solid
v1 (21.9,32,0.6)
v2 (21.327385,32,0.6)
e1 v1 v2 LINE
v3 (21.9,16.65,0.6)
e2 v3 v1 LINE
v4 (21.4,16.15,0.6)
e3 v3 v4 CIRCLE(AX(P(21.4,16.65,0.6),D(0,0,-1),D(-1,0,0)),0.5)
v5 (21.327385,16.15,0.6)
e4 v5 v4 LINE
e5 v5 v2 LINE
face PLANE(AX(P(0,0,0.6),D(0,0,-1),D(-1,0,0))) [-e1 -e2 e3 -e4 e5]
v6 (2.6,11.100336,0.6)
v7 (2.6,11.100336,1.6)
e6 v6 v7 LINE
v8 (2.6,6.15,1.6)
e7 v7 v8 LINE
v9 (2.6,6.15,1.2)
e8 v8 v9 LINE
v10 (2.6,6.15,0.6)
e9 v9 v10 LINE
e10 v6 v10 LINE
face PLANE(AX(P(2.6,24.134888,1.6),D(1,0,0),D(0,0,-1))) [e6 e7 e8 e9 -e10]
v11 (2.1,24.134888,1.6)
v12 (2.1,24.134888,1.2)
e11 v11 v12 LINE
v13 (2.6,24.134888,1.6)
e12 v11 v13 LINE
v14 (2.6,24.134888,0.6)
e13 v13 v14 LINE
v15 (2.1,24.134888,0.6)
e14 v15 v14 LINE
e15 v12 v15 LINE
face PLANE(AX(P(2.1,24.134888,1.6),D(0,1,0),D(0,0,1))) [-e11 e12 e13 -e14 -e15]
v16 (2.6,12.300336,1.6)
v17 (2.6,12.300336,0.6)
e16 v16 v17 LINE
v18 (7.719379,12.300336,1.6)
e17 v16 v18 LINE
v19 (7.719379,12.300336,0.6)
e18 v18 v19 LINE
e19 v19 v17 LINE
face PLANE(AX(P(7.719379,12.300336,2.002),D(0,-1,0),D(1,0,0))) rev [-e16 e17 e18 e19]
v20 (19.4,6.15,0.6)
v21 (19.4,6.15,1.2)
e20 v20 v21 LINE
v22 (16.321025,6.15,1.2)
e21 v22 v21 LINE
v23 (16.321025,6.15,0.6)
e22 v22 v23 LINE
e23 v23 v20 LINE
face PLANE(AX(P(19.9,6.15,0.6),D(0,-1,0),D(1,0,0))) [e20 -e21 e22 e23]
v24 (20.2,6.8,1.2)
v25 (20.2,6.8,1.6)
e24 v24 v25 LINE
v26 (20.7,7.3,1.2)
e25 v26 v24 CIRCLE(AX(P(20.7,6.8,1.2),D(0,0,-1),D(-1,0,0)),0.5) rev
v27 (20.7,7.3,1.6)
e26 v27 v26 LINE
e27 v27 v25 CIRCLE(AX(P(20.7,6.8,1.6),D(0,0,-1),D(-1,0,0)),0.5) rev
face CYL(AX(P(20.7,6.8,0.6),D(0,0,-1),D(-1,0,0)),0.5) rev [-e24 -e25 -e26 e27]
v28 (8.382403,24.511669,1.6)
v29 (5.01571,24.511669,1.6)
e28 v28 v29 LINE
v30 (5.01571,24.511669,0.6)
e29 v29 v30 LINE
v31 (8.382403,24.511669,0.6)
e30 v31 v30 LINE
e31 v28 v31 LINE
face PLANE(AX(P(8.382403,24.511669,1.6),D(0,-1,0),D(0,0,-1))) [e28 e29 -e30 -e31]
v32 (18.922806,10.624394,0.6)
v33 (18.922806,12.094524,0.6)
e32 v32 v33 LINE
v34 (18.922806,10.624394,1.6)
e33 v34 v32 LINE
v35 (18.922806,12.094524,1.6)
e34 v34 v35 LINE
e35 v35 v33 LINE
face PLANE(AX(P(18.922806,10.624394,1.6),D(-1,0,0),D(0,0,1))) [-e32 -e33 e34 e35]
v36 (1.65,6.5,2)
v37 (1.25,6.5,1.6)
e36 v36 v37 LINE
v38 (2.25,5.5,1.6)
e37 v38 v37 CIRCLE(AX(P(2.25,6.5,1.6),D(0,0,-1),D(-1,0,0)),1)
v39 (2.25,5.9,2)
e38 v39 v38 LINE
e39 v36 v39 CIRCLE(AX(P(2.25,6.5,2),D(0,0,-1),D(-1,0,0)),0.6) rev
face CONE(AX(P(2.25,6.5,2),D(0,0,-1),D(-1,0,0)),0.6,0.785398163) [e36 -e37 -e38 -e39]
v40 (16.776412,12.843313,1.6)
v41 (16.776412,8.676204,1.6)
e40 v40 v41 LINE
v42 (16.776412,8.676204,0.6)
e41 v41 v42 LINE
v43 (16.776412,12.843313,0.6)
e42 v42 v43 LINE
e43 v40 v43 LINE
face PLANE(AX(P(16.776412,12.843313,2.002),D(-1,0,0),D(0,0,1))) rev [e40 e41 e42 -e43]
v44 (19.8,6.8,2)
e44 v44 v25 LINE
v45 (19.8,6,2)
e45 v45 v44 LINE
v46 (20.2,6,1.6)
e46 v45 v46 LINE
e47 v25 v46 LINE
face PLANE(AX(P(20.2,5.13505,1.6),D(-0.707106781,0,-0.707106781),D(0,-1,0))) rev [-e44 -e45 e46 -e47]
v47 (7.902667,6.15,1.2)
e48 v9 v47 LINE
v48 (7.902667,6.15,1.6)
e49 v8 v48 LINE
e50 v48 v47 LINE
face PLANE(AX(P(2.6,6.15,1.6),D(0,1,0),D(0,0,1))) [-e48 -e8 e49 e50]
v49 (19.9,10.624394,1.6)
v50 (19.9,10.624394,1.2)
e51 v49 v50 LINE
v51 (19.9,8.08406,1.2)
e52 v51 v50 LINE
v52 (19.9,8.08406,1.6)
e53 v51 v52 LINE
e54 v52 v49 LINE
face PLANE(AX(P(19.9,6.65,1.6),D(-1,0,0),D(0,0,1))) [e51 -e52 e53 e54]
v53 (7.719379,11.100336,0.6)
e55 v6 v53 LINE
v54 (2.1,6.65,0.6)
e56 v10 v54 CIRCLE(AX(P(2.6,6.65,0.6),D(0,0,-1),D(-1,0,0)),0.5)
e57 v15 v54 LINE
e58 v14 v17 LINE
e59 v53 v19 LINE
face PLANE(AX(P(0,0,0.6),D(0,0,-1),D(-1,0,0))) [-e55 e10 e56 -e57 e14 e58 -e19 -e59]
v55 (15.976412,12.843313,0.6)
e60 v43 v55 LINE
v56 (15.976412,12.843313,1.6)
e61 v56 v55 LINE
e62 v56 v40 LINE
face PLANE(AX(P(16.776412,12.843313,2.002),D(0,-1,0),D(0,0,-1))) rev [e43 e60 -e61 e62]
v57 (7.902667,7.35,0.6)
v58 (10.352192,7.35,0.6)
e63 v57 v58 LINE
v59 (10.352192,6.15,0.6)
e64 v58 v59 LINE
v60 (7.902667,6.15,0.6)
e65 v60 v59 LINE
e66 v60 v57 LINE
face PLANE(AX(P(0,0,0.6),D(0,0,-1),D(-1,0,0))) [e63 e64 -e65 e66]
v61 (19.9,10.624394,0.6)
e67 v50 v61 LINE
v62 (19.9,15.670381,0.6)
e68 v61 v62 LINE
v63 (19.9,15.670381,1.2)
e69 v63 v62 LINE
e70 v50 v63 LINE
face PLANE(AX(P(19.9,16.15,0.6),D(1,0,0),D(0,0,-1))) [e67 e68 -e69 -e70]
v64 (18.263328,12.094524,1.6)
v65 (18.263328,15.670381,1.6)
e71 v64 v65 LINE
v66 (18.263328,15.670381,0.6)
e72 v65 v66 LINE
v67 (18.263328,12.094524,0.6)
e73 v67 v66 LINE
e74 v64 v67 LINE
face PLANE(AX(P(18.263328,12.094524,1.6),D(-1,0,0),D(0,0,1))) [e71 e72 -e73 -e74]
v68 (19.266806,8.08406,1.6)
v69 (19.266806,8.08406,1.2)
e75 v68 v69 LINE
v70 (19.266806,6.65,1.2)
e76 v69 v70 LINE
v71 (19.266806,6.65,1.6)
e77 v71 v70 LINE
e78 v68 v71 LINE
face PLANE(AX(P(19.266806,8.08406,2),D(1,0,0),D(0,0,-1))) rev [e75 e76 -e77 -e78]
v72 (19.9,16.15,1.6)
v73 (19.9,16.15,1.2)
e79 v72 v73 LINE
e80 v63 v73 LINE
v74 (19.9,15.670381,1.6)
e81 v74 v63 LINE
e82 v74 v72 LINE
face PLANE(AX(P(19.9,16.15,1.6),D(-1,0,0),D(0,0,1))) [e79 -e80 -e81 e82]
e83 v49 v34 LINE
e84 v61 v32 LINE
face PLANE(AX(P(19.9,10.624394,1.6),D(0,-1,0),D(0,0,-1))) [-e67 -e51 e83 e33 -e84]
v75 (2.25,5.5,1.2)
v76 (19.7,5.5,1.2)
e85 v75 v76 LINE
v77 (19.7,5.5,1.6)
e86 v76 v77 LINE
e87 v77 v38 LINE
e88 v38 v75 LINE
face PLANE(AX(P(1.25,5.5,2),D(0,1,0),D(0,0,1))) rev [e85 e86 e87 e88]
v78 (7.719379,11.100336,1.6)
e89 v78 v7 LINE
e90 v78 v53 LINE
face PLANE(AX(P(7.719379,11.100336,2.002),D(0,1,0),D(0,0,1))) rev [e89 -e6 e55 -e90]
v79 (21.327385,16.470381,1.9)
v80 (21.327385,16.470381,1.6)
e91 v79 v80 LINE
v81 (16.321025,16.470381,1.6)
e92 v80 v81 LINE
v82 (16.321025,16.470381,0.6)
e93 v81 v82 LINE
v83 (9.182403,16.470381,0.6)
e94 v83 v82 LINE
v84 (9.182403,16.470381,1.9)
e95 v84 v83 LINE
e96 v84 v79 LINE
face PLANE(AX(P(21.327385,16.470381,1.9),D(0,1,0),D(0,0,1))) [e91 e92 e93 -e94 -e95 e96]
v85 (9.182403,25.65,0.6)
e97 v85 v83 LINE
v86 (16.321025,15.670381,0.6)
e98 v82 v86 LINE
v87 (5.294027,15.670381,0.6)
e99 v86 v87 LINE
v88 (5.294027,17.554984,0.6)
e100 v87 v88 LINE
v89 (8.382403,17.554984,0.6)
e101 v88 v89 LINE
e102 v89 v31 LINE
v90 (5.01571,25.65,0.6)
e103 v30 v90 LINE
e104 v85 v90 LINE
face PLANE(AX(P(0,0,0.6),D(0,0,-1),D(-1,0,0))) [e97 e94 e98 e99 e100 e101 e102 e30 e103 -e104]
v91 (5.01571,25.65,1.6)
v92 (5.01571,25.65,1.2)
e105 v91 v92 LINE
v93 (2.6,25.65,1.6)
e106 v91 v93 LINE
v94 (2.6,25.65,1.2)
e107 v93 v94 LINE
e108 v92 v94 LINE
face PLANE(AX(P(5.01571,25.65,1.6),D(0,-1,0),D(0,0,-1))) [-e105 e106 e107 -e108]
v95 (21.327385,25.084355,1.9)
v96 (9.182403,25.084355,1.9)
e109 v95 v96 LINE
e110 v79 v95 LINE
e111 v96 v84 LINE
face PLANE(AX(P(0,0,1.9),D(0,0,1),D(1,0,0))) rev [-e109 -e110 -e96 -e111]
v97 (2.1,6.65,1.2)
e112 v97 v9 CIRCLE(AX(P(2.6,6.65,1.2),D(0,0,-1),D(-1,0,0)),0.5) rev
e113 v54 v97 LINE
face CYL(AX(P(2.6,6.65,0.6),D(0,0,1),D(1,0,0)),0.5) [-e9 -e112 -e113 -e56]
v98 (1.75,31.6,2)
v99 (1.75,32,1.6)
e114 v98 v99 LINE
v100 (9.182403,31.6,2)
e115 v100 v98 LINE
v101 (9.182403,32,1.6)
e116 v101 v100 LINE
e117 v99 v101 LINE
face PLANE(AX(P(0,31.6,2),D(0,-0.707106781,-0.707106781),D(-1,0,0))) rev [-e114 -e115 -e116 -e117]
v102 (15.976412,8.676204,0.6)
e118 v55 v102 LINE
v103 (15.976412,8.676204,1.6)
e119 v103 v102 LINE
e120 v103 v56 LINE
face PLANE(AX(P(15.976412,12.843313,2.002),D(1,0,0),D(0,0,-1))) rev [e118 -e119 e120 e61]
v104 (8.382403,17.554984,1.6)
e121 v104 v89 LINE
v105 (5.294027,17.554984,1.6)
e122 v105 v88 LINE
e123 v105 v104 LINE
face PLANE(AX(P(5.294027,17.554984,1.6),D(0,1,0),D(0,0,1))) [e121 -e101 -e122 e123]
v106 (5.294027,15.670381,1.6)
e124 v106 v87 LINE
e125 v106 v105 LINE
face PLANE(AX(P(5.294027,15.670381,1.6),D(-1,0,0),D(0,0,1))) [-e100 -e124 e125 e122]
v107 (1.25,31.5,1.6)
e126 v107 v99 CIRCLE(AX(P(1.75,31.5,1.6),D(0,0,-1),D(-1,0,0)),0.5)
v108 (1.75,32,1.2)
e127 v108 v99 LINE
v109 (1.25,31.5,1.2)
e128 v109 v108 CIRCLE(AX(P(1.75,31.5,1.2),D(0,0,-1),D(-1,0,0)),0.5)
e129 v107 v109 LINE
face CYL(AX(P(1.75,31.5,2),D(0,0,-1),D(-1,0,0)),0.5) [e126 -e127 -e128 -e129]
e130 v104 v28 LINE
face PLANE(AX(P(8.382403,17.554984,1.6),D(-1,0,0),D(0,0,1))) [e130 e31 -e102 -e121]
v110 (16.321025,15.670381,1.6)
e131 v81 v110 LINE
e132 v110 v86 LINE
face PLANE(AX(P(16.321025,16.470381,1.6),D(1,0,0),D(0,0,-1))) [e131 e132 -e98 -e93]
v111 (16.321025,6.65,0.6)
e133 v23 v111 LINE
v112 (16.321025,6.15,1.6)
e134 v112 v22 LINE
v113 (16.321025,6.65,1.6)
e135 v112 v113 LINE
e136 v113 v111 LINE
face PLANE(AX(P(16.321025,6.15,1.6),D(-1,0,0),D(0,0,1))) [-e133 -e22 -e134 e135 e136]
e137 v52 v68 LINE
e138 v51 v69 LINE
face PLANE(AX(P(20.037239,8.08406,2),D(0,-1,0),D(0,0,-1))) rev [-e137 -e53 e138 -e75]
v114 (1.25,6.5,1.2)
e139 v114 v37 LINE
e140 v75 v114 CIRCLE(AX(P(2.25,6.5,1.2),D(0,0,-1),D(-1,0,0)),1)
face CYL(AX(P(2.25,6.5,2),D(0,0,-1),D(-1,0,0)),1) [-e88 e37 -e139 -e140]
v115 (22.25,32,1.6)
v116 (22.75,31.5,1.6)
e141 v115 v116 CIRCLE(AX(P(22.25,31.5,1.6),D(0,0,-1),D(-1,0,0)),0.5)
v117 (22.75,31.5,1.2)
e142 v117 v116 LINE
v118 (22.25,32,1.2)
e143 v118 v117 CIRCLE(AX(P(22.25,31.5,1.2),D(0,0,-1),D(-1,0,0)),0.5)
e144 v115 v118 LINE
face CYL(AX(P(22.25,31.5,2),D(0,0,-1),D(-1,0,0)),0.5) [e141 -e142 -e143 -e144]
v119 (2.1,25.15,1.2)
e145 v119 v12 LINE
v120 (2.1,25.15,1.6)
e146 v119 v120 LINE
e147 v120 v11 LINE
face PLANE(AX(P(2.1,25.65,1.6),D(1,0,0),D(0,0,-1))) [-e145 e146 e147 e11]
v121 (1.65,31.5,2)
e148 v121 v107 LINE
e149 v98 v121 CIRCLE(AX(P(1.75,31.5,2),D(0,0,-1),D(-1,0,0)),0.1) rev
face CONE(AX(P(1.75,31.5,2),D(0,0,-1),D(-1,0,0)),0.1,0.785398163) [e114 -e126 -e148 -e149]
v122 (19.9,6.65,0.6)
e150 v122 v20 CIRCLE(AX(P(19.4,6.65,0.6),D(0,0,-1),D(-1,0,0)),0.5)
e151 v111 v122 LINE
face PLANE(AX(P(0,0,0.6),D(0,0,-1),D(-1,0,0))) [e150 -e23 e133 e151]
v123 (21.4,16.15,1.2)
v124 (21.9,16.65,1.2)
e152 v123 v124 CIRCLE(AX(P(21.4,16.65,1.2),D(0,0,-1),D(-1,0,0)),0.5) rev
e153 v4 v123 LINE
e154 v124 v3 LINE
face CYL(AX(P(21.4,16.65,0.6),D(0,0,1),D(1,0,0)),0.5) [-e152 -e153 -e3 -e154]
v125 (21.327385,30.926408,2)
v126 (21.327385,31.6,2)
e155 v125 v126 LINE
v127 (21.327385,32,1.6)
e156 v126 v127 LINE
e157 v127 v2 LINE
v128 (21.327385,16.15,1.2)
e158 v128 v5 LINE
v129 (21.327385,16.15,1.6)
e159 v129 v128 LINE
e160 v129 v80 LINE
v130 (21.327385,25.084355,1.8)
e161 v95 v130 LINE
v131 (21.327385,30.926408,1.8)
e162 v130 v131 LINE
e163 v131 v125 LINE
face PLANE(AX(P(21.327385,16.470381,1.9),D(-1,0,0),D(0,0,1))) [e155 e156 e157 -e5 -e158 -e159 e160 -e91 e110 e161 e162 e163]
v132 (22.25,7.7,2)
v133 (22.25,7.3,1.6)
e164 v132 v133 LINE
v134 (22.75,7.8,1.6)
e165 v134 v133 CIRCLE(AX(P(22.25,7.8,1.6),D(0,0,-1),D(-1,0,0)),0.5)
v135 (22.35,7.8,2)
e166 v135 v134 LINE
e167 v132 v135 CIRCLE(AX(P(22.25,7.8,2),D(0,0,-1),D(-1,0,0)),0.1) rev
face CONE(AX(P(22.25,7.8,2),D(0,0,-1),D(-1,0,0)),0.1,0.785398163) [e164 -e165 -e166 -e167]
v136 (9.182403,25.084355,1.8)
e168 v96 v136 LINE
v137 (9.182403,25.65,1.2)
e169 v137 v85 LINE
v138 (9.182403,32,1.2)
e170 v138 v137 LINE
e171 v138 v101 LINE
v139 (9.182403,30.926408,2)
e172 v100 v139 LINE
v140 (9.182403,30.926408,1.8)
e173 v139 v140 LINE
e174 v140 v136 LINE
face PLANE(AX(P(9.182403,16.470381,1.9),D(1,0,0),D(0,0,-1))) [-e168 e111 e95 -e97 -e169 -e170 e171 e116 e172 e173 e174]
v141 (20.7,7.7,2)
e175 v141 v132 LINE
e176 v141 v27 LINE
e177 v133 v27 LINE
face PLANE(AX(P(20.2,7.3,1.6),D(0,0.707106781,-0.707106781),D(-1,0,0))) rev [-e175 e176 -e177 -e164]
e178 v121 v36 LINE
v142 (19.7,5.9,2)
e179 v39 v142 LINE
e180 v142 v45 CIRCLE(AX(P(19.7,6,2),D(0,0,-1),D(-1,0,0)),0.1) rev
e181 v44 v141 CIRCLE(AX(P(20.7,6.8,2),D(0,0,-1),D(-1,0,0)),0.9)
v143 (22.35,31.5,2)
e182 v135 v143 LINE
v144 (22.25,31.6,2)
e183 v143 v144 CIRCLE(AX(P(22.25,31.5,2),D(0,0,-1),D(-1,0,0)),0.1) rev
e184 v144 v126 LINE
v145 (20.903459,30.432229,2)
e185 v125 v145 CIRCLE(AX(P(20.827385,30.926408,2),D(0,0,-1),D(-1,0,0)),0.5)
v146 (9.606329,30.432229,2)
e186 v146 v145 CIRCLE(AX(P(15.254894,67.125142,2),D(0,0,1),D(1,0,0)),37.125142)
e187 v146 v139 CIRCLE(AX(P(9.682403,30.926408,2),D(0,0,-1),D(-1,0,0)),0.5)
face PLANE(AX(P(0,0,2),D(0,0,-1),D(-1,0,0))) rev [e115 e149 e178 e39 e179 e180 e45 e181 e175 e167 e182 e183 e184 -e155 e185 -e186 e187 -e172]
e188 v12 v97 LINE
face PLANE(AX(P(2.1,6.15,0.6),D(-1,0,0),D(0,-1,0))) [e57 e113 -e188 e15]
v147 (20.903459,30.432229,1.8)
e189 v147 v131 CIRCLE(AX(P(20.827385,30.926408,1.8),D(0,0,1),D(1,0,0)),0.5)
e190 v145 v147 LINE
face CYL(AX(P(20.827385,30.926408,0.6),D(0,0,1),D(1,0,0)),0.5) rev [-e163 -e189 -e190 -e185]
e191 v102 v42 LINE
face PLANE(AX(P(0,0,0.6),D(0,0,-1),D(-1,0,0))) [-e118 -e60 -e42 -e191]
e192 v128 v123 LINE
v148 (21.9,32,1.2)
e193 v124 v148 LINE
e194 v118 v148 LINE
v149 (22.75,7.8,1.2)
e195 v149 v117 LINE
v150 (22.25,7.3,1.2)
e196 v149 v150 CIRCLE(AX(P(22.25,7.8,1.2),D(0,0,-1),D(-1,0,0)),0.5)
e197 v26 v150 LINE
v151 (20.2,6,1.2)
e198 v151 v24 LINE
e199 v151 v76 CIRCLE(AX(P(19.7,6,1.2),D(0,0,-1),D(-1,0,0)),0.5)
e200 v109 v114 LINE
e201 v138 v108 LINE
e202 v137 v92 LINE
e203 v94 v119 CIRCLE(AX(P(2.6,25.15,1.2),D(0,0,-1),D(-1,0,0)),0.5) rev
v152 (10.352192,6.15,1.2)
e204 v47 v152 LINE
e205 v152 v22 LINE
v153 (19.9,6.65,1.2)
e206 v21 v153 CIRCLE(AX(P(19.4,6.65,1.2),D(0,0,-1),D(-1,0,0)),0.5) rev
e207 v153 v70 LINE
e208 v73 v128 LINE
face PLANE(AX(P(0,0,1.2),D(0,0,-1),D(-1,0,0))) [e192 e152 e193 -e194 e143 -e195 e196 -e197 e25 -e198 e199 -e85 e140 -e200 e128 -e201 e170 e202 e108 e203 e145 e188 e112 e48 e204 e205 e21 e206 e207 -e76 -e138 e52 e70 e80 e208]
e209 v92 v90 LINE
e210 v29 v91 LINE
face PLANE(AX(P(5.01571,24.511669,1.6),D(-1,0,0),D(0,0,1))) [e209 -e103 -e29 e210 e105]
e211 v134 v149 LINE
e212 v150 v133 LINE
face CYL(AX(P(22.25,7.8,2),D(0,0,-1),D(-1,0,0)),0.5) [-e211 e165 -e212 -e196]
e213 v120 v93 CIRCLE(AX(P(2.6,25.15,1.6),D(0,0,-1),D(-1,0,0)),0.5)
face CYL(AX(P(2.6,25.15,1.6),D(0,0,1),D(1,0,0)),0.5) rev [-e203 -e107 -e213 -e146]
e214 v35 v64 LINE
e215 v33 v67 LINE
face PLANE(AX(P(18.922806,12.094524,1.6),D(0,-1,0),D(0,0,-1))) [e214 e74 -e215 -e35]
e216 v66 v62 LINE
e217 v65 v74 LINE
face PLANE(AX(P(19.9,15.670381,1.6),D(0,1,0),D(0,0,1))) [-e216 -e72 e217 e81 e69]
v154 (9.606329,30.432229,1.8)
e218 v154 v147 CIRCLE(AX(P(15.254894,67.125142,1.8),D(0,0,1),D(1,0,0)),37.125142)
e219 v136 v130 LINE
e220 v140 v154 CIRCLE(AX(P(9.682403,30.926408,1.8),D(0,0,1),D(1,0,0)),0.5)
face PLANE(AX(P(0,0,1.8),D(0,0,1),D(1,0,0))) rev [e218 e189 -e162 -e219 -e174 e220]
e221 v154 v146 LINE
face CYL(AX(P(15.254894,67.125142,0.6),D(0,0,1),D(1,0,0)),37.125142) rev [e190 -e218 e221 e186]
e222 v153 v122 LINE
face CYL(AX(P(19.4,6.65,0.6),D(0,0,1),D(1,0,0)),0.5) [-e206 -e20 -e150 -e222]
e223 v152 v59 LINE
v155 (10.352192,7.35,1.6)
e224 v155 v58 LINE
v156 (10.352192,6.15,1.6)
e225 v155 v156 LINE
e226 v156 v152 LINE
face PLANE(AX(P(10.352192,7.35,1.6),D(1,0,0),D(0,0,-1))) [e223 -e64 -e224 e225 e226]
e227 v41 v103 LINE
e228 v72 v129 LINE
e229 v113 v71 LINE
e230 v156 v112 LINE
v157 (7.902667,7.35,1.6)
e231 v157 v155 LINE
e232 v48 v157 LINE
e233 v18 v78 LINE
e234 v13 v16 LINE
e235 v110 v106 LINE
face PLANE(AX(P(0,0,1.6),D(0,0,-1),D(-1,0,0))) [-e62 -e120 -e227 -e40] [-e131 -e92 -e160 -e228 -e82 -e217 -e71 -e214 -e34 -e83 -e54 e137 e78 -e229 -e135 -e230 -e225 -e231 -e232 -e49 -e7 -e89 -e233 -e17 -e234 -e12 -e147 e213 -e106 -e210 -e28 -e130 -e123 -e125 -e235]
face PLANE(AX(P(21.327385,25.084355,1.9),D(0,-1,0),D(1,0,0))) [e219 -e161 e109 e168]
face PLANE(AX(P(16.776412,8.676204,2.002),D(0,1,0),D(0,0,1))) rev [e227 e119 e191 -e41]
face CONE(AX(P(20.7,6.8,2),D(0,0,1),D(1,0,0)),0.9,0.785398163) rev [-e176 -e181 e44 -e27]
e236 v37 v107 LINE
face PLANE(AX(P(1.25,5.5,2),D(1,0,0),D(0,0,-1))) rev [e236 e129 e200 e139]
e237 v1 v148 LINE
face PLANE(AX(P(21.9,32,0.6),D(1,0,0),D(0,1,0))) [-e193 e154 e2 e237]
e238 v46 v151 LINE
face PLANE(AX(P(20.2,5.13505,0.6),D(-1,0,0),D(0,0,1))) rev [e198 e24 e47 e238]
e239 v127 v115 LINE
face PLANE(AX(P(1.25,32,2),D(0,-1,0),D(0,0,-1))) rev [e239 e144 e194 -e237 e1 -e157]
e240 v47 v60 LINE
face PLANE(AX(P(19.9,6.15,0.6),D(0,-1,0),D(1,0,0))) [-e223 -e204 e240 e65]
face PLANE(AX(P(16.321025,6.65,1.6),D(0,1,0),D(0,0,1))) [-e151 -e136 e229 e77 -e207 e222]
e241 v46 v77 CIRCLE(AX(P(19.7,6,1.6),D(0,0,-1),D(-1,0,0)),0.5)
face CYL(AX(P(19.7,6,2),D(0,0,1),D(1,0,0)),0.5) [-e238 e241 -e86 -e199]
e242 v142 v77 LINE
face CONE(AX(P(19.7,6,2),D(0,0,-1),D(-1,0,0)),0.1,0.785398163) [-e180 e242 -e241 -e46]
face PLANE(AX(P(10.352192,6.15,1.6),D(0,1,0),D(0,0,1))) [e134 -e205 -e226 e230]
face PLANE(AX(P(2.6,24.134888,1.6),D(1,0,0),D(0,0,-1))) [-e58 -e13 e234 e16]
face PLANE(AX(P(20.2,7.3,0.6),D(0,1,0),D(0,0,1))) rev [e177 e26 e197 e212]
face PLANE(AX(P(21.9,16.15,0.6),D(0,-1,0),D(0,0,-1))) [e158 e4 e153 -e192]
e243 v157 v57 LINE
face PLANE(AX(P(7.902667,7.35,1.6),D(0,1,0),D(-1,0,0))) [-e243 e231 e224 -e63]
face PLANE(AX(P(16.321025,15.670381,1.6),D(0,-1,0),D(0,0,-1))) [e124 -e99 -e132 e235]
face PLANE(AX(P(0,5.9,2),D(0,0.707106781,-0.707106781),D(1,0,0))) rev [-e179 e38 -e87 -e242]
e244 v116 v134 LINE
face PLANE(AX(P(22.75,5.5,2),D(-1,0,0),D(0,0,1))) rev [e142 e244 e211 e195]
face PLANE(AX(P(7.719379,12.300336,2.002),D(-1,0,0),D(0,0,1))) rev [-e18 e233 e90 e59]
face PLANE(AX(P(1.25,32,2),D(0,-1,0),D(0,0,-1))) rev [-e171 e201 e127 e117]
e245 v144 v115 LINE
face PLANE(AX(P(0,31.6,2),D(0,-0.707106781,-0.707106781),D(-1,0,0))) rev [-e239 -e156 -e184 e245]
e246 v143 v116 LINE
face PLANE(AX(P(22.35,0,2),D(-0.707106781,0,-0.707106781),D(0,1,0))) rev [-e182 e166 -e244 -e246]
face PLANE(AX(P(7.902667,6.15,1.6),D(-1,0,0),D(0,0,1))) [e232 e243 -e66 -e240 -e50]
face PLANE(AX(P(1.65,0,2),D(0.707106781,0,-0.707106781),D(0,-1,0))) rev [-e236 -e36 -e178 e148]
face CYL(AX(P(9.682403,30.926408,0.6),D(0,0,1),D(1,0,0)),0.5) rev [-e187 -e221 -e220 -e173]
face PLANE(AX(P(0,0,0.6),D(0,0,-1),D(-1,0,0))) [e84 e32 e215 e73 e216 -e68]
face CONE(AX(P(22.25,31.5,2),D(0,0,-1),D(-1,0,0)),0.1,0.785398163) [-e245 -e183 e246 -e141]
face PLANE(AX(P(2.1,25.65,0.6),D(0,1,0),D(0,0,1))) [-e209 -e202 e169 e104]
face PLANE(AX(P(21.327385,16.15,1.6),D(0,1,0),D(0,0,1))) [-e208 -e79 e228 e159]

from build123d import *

# Parameters (mm, degrees)
SKIZZE2_W                                   = 21.5
SKIZZE2_H                                   = 26.5
AUFSATZ_LINEAR_AUSTRAGEN1_DEPTH             = 0.8
AUFSATZ_LINEAR_AUSTRAGEN2_DEPTH             = 0.6
SCHNITT_LINEAR_AUSTRAGEN2_DEPTH             = 0.7
SCHNITT_LINEAR_AUSTRAGEN2_DEPTH_BACK        = 40.270886163
SKIZZE5_W                                   = 12.144981168
SKIZZE5_H                                   = 8.613973721
SCHNITT_LINEAR_AUSTRAGEN1_DEPTH             = 0.4
SCHNITT_LINEAR_AUSTRAGEN1_DEPTH_BACK        = 40.270886163
SCHNITT_LINEAR_AUSTRAGEN3_DEPTH             = 0.6
SCHNITT_LINEAR_AUSTRAGEN3_DEPTH_BACK        = 40.270886163
SKIZZE6_W                                   = 12.144981168
SKIZZE6_H                                   = 8.023619308
VERRUNDUNG1_R                               = 0.5
SCHNITT_LINEAR_AUSTRAGEN4_DEPTH             = 40.270886163
SCHNITT_LINEAR_AUSTRAGEN4_DEPTH_BACK        = 40.270886163
VERRUNDUNG3_R                               = 0.5
SKIZZE8_W                                   = 5.461913831
SKIZZE8_H                                   = 1.2
SKIZZE8_W_2                                 = 0.8
SKIZZE8_H_2                                 = 4.167109648
AUFSATZ_LINEAR_AUSTRAGEN3_DEPTH             = 0.6
AUFSATZ_LINEAR_AUSTRAGEN3_DIRECTION_2_REACH = 41.271
SCHNITT_LINEAR_AUSTRAGEN5_DEPTH             = 40.270886163
SCHNITT_LINEAR_AUSTRAGEN5_DEPTH_BACK        = 40.270886163
SKIZZE9_W                                   = 2.954983754
SKIZZE9_H                                   = 2.164950306
SKIZZE10_W                                  = 0.770433568
SKIZZE10_H                                  = 2.170677495
AUFSATZ_LINEAR_AUSTRAGEN4_DEPTH             = 0.8
VERRUNDUNG2_R                               = 1
VERRUNDUNG4_R                               = 0.5
FASE1_SIZE                                  = 0.4


with BuildPart() as part:
    # Skizze2 → Aufsatz-Linear austragen1 (new body)
    with BuildSketch(Plane.XY.offset(1.2)):
        with Locations((12, 18.75)):
            Rectangle(SKIZZE2_W, SKIZZE2_H)
    extrude(amount=AUFSATZ_LINEAR_AUSTRAGEN1_DEPTH)

    # Skizze3 → Aufsatz-Linear austragen2 (add)
    with BuildSketch(Plane.XY.offset(1.2)):
        Polygon((21.9, 32), (21.9, 16.15), (19.9, 16.15), (19.9, 6.15), (2.1, 6.15), (2.1, 25.65), (10, 25.65), (10, 32), align=None)
    extrude(amount=-AUFSATZ_LINEAR_AUSTRAGEN2_DEPTH)

    # Skizze5 → Schnitt-Linear austragen2 (cut, two sides: drawn at the far end of the back side and taken through both)
    with BuildSketch(Plane.XY.offset(1.2).offset(-SCHNITT_LINEAR_AUSTRAGEN2_DEPTH_BACK)):
        with Locations((15.254893919, 20.77736777)):
            Rectangle(SKIZZE5_W, SKIZZE5_H)
    extrude(amount=SCHNITT_LINEAR_AUSTRAGEN2_DEPTH + SCHNITT_LINEAR_AUSTRAGEN2_DEPTH_BACK, mode=Mode.SUBTRACT)

    # Skizze4 → Schnitt-Linear austragen1 (cut, two sides: drawn at the far end of the back side and taken through both)
    with BuildSketch(Plane.XY.offset(1.2).offset(-SCHNITT_LINEAR_AUSTRAGEN1_DEPTH_BACK)):
        Polygon((8.382403335, 24.511668734), (5.015709698, 24.511668734), (5.015709698, 25.65), (2.1, 25.65), (2.1, 24.134887808), (2.6, 24.134887808), (2.6, 6.15), (7.902667193, 6.15), (7.902667193, 7.35), (10.352191741, 7.35), (10.352191741, 6.15), (16.321024544, 6.15), (16.321024544, 6.65), (19.9, 6.65), (19.9, 10.624393956), (18.922805677, 10.624393956), (18.922805677, 12.094523693), (18.263327803, 12.094523693), (18.263327803, 15.67038091), (19.9, 15.67038091), (19.9, 16.15), (21.327384503, 16.15), (21.327384503, 16.47038091), (16.321024544, 16.47038091), (16.321024544, 15.67038091), (5.294026876, 15.67038091), (5.294026876, 17.554984477), (8.382403335, 17.554984477), align=None)
    extrude(amount=SCHNITT_LINEAR_AUSTRAGEN1_DEPTH + SCHNITT_LINEAR_AUSTRAGEN1_DEPTH_BACK, mode=Mode.SUBTRACT)

    # Skizze6 → Schnitt-Linear austragen3 (cut, two sides: drawn at the far end of the back side and taken through both)
    with BuildSketch(Plane.XY.offset(1.2).offset(-SCHNITT_LINEAR_AUSTRAGEN3_DEPTH_BACK)):
        with Locations((15.254893919, 29.096164285)):
            Rectangle(SKIZZE6_W, SKIZZE6_H)
    extrude(amount=SCHNITT_LINEAR_AUSTRAGEN3_DEPTH + SCHNITT_LINEAR_AUSTRAGEN3_DEPTH_BACK, mode=Mode.SUBTRACT)

    # Verrundung1
    verrundung1_edges = [part.edges().sort_by_distance(p)[0] for p in [
        (21.9, 16.15, 0.9),
        (2.1, 25.65, 1.4),
        (2.1, 6.15, 0.9),
        (19.9, 6.15, 0.9),
    ]]
    fillet(verrundung1_edges, radius=VERRUNDUNG1_R - 0.0001)  # a hair under: the kernel refuses the full size

    # Skizze7 → Schnitt-Linear austragen4 (cut, two sides: drawn at the far end of the back side and taken through both)
    with BuildSketch(Plane.XY.offset(1.2).offset(-SCHNITT_LINEAR_AUSTRAGEN4_DEPTH_BACK)):
        with BuildLine():
            Line((21.327384503, 30.5), (21.327384503, 32.799881912))
            Line((21.327384503, 32.799881912), (9.182403335, 32.799881912))
            Line((9.182403335, 32.799881912), (9.182403335, 30.5))
            ThreePointArc((9.182403335, 30.5), (15.254893919, 30), (21.327384503, 30.5))
        make_face()
    extrude(amount=SCHNITT_LINEAR_AUSTRAGEN4_DEPTH + SCHNITT_LINEAR_AUSTRAGEN4_DEPTH_BACK, mode=Mode.SUBTRACT)

    # Verrundung3
    verrundung3_edges = [part.edges().sort_by_distance(p)[0] for p in [
        (9.182403335, 30.5, 1.9),
        (21.327384503, 30.5, 1.9),
    ]]
    fillet(verrundung3_edges, radius=VERRUNDUNG3_R)

    # Skizze8 → Aufsatz-Linear austragen3 (add)
    with BuildSketch(Plane.XY.offset(1.2)):
        with Locations((4.988422265, 11.700335539)):
            Rectangle(SKIZZE8_W, SKIZZE8_H)
        with Locations((16.376411907, 10.759758473)):
            Rectangle(SKIZZE8_W_2, SKIZZE8_H_2)
    extrude(amount=-AUFSATZ_LINEAR_AUSTRAGEN3_DEPTH)

    # Skizze8 → Aufsatz-Linear austragen3 direction 2 (add, up to next)
    with BuildSketch(Plane.XY.offset(1.2), mode=Mode.PRIVATE) as aufsatz_linear_austragen3_direction_2_sk1:
        with Locations((4.988422265, 11.700335539)):
            Rectangle(SKIZZE8_W, SKIZZE8_H)
    aufsatz_linear_austragen3_direction_2_tool1 = extrude(aufsatz_linear_austragen3_direction_2_sk1.sketch, amount=AUFSATZ_LINEAR_AUSTRAGEN3_DIRECTION_2_REACH, mode=Mode.PRIVATE) - part.part
    # Skizze8 → Aufsatz-Linear austragen3 direction 2 (add, up to next)
    with BuildSketch(Plane.XY.offset(1.2), mode=Mode.PRIVATE) as aufsatz_linear_austragen3_direction_2_sk2:
        with Locations((16.376411907, 10.759758473)):
            Rectangle(SKIZZE8_W_2, SKIZZE8_H_2)
    aufsatz_linear_austragen3_direction_2_tool2 = extrude(aufsatz_linear_austragen3_direction_2_sk2.sketch, amount=AUFSATZ_LINEAR_AUSTRAGEN3_DIRECTION_2_REACH, mode=Mode.PRIVATE) - part.part
    add(aufsatz_linear_austragen3_direction_2_tool1.solids().sort_by_distance((4.988422, 11.700336, 1.2))[0])
    add(aufsatz_linear_austragen3_direction_2_tool2.solids().sort_by_distance((16.376412, 10.759758, 1.2))[0])

    # Skizze9 → Schnitt-Linear austragen5 (cut, two sides: drawn at the far end of the back side and taken through both)
    with BuildSketch(Plane.XY.offset(1.2).offset(-SCHNITT_LINEAR_AUSTRAGEN5_DEPTH_BACK)):
        with Locations((21.677491877, 6.217524847)):
            Rectangle(SKIZZE9_W, SKIZZE9_H)
    extrude(amount=SCHNITT_LINEAR_AUSTRAGEN5_DEPTH + SCHNITT_LINEAR_AUSTRAGEN5_DEPTH_BACK, mode=Mode.SUBTRACT)

    # Skizze10 → Aufsatz-Linear austragen4 (add)
    with BuildSketch(Plane.XY.offset(1.2)):
        with Locations((19.652022519, 6.998720979)):
            Rectangle(SKIZZE10_W, SKIZZE10_H)
    extrude(amount=AUFSATZ_LINEAR_AUSTRAGEN4_DEPTH)

    # Verrundung2
    verrundung2_edges = [part.edges().sort_by_distance(p)[0] for p in [
        (1.25, 5.5, 1.6),
    ]]
    fillet(verrundung2_edges, radius=VERRUNDUNG2_R)

    # Verrundung4
    verrundung4_edges = [part.edges().sort_by_distance(p)[0] for p in [
        (22.75, 7.3, 1.6),
        (20.2, 5.5, 1.6),
        (20.2, 7.3, 1.6),
        (1.25, 32, 1.6),
        (22.75, 32, 1.6),
    ]]
    fillet(verrundung4_edges, radius=VERRUNDUNG4_R)

    # Fase1
    fase1_edges = [part.edges().sort_by_distance(p)[0] for p in [
        (5.466201668, 32, 2),
        (10.975, 5.5, 2),
        (1.542893219, 5.792893219, 2),
        (22.75, 19.65, 2),
        (21.475, 7.3, 2),
        (1.25, 19, 2),
        (20.2, 6.4, 2),
        (21.788692251, 32, 2),
        (1.396446609, 31.853553391, 2),
        (22.603553391, 31.853553391, 2),
        (20.053553391, 5.646446609, 2),
        (22.603553391, 7.446446609, 2),
        (20.346446609, 7.153553391, 2),
    ]]
    chamfer(fase1_edges, length=FASE1_SIZE)


solid = part.part
